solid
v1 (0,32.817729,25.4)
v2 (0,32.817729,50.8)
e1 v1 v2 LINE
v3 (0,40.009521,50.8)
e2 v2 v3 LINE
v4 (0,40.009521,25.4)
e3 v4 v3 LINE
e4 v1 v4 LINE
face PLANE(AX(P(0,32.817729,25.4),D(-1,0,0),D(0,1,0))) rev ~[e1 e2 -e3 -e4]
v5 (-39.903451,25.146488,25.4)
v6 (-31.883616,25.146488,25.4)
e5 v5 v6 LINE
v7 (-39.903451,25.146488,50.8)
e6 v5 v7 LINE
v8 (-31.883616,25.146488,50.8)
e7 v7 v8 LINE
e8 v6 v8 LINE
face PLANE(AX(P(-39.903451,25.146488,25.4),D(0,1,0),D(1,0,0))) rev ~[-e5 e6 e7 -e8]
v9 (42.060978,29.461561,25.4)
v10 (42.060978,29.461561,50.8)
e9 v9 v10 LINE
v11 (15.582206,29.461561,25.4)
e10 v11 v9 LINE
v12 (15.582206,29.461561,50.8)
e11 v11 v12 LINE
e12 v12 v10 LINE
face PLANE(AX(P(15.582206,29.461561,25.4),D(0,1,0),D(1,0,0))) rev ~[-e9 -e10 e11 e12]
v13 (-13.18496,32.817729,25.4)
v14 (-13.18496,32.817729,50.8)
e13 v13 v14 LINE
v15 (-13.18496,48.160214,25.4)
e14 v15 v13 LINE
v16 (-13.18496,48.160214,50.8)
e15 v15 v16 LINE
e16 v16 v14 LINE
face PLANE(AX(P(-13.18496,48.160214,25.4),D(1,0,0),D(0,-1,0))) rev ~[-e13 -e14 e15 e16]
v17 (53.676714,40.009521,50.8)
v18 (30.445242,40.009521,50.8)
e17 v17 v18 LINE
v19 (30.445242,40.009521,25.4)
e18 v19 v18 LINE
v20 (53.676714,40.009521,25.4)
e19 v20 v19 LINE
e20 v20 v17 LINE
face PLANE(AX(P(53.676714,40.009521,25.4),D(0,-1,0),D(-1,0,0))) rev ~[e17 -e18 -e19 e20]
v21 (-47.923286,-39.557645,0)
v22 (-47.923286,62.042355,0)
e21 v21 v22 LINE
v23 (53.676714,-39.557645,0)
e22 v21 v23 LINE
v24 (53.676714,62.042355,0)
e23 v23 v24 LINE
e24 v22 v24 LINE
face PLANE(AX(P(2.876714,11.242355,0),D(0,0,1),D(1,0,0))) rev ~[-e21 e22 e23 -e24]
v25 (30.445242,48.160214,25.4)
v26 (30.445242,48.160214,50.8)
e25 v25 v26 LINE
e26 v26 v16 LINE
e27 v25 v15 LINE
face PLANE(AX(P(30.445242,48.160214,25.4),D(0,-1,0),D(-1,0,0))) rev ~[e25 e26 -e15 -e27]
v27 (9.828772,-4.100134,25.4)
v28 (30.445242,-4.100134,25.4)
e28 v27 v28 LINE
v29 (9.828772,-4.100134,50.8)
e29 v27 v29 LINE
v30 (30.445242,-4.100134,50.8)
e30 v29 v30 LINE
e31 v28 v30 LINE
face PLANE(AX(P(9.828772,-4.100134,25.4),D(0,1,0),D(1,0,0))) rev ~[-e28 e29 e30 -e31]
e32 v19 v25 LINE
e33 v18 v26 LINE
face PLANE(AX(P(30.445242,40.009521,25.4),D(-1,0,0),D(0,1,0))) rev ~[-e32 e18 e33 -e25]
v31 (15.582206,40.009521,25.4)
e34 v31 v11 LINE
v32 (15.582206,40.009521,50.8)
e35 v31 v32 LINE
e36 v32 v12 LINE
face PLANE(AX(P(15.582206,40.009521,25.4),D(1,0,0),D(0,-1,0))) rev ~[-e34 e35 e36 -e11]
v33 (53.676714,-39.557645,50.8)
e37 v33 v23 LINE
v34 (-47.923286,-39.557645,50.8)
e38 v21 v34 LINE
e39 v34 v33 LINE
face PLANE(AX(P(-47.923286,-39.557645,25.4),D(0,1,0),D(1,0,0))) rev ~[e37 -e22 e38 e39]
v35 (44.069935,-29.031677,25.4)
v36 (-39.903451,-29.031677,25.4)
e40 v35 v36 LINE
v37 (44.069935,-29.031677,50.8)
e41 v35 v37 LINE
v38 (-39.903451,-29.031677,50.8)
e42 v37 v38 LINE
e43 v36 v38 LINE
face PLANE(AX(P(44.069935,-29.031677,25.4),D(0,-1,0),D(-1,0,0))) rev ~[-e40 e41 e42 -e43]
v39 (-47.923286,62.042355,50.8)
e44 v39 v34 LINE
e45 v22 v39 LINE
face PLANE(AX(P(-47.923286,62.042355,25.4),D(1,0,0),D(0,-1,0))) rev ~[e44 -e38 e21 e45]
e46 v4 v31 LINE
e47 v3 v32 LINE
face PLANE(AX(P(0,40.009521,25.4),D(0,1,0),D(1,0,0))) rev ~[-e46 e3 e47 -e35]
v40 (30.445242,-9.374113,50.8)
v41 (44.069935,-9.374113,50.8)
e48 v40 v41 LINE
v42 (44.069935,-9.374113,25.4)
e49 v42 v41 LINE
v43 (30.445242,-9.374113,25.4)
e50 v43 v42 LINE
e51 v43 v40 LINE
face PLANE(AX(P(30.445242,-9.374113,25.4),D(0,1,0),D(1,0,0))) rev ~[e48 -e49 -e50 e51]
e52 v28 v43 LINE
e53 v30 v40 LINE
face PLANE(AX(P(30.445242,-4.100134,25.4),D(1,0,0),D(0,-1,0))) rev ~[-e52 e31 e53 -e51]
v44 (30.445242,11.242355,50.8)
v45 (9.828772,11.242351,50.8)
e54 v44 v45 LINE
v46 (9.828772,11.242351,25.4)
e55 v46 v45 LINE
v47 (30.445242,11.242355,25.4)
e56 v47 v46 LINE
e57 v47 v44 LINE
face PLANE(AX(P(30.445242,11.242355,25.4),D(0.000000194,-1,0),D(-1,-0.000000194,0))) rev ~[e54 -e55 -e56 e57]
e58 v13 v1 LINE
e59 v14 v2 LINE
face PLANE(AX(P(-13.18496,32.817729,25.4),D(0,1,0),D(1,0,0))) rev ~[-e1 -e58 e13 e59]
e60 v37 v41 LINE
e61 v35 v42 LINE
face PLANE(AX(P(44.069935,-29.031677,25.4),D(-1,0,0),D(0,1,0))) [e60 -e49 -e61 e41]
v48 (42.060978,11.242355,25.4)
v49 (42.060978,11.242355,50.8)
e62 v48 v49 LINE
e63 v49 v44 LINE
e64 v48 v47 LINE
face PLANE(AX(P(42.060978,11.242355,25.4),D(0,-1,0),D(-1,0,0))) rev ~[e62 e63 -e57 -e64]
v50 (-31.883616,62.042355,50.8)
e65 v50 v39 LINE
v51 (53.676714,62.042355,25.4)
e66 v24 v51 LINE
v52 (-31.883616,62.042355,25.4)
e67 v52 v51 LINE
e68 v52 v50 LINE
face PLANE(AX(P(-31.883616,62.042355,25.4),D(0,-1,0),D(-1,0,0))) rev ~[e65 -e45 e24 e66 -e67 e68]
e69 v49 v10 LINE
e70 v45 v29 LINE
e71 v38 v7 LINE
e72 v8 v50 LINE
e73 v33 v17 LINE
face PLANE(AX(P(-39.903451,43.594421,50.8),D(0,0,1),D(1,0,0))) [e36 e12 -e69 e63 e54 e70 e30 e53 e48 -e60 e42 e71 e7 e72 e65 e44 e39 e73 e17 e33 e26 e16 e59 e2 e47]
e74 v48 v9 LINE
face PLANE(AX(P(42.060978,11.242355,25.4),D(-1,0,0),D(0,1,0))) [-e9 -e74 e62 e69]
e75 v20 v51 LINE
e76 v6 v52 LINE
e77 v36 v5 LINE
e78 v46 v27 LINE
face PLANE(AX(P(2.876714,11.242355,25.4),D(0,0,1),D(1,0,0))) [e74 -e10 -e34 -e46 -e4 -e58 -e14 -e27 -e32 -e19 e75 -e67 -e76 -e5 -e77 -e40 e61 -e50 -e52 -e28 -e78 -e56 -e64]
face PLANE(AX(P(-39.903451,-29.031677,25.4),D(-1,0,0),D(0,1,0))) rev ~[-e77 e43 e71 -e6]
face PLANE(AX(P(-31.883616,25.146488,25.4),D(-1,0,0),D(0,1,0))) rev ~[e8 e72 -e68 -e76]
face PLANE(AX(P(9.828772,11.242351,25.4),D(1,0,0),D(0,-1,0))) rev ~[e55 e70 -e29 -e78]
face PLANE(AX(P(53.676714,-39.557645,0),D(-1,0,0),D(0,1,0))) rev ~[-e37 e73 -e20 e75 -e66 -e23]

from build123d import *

# Parameters (mm, degrees)
F0_W     = 101.6
F0_H     = 101.6
F1_DEPTH = 25.4
F2_W     = 9.6067792356
F2_H     = 19.6575643495
F2_W_2   = 23.4931828454
F2_H_2   = 10.5259682656
F2_W_3   = 8.0198350638
F2_H_3   = 12.465775013
F2_H_4   = 41.7123902589
F2_W_4   = 11.6157357857
F2_H_5   = 18.2192062081
F3_DEPTH = 25.4


# Not quite as in the source:
# - ends of sketch curves that miss each other by under 0.0002 mm in the source are joined


with BuildPart() as f1:
    # F0 (on Top) → F1 (new body)
    with BuildSketch(Plane.XY):
        with Locations((2.876713872, 11.2423545628)):
            Rectangle(F0_W, F0_H)
    extrude(amount=F1_DEPTH)

    # F2 (on face) → F3 (join)
    with BuildSketch(Plane.XY.offset(25.4)):
        Polygon((-31.8836160004, 25.1464881003), (-31.8836160004, 62.0423545628), (-47.923286128, 62.0423545628), (-47.923286128, 25.1464881003), (-39.9034510642, 25.1464881003), align=None)
        Polygon((0, 32.8177288175), (0, 40.0095209479), (0, 48.1602139771), (-13.1849600002, 48.1602139771), (-13.1849600002, 32.8177288175), align=None)
        Polygon((15.5822057277, 40.0095209479), (30.4452423006, 40.0095209479), (30.4452423006, 48.1602139771), (0, 48.1602139771), (0, 40.0095209479), align=None)
        Polygon((42.0609780863, 29.4615607709), (53.676713872, 29.4615607709), (53.676713872, 40.0095209479), (30.4452423006, 40.0095209479), (15.5822057277, 40.0095209479), (15.5822057277, 29.4615607709), align=None)
        Polygon((30.4452423006, -4.1001341306), (30.4452423006, 11.2423545628), (9.8287723958, 11.2423505634), (9.8287723958, -4.1001341306), align=None)
        Polygon((44.0699346364, -9.3741128221), (53.676713872, -9.3741128221), (53.676713872, 11.2423545628), (42.0609780863, 11.2423545628), (30.4452423006, 11.2423545628), (30.4452423006, -4.1001341306), (30.4452423006, -9.3741128221), (42.0609780863, -9.3741128221), align=None)
        with Locations((48.8733242542, -19.2028949969)):
            Rectangle(F2_W, F2_H)
        Polygon((53.676713872, -39.5576454372), (53.676713872, -29.0316771716), (44.0699346364, -29.0316771716), (42.0609780863, -29.0316771716), (-8.390433155, -29.0316771716), (-8.390433155, -39.5576454372), align=None)
        with Locations((-20.1370245777, -34.2946613044)):
            Rectangle(F2_W_2, F2_H_2)
        with Locations((-43.9133685961, -22.7987896651)):
            Rectangle(F2_W_3, F2_H_3)
        Polygon((-47.923286128, -39.5576454372), (-31.8836160004, -39.5576454372), (-31.8836160004, -29.0316771716), (-39.9034510642, -29.0316771716), (-47.923286128, -29.0316771716), align=None)
        with Locations((-43.9133685961, 4.2902929708)):
            Rectangle(F2_W_3, F2_H_4)
        with Locations((47.8688459791, 20.3519576668)):
            Rectangle(F2_W_4, F2_H_5)
    extrude(amount=F3_DEPTH)


solid = f1.part
